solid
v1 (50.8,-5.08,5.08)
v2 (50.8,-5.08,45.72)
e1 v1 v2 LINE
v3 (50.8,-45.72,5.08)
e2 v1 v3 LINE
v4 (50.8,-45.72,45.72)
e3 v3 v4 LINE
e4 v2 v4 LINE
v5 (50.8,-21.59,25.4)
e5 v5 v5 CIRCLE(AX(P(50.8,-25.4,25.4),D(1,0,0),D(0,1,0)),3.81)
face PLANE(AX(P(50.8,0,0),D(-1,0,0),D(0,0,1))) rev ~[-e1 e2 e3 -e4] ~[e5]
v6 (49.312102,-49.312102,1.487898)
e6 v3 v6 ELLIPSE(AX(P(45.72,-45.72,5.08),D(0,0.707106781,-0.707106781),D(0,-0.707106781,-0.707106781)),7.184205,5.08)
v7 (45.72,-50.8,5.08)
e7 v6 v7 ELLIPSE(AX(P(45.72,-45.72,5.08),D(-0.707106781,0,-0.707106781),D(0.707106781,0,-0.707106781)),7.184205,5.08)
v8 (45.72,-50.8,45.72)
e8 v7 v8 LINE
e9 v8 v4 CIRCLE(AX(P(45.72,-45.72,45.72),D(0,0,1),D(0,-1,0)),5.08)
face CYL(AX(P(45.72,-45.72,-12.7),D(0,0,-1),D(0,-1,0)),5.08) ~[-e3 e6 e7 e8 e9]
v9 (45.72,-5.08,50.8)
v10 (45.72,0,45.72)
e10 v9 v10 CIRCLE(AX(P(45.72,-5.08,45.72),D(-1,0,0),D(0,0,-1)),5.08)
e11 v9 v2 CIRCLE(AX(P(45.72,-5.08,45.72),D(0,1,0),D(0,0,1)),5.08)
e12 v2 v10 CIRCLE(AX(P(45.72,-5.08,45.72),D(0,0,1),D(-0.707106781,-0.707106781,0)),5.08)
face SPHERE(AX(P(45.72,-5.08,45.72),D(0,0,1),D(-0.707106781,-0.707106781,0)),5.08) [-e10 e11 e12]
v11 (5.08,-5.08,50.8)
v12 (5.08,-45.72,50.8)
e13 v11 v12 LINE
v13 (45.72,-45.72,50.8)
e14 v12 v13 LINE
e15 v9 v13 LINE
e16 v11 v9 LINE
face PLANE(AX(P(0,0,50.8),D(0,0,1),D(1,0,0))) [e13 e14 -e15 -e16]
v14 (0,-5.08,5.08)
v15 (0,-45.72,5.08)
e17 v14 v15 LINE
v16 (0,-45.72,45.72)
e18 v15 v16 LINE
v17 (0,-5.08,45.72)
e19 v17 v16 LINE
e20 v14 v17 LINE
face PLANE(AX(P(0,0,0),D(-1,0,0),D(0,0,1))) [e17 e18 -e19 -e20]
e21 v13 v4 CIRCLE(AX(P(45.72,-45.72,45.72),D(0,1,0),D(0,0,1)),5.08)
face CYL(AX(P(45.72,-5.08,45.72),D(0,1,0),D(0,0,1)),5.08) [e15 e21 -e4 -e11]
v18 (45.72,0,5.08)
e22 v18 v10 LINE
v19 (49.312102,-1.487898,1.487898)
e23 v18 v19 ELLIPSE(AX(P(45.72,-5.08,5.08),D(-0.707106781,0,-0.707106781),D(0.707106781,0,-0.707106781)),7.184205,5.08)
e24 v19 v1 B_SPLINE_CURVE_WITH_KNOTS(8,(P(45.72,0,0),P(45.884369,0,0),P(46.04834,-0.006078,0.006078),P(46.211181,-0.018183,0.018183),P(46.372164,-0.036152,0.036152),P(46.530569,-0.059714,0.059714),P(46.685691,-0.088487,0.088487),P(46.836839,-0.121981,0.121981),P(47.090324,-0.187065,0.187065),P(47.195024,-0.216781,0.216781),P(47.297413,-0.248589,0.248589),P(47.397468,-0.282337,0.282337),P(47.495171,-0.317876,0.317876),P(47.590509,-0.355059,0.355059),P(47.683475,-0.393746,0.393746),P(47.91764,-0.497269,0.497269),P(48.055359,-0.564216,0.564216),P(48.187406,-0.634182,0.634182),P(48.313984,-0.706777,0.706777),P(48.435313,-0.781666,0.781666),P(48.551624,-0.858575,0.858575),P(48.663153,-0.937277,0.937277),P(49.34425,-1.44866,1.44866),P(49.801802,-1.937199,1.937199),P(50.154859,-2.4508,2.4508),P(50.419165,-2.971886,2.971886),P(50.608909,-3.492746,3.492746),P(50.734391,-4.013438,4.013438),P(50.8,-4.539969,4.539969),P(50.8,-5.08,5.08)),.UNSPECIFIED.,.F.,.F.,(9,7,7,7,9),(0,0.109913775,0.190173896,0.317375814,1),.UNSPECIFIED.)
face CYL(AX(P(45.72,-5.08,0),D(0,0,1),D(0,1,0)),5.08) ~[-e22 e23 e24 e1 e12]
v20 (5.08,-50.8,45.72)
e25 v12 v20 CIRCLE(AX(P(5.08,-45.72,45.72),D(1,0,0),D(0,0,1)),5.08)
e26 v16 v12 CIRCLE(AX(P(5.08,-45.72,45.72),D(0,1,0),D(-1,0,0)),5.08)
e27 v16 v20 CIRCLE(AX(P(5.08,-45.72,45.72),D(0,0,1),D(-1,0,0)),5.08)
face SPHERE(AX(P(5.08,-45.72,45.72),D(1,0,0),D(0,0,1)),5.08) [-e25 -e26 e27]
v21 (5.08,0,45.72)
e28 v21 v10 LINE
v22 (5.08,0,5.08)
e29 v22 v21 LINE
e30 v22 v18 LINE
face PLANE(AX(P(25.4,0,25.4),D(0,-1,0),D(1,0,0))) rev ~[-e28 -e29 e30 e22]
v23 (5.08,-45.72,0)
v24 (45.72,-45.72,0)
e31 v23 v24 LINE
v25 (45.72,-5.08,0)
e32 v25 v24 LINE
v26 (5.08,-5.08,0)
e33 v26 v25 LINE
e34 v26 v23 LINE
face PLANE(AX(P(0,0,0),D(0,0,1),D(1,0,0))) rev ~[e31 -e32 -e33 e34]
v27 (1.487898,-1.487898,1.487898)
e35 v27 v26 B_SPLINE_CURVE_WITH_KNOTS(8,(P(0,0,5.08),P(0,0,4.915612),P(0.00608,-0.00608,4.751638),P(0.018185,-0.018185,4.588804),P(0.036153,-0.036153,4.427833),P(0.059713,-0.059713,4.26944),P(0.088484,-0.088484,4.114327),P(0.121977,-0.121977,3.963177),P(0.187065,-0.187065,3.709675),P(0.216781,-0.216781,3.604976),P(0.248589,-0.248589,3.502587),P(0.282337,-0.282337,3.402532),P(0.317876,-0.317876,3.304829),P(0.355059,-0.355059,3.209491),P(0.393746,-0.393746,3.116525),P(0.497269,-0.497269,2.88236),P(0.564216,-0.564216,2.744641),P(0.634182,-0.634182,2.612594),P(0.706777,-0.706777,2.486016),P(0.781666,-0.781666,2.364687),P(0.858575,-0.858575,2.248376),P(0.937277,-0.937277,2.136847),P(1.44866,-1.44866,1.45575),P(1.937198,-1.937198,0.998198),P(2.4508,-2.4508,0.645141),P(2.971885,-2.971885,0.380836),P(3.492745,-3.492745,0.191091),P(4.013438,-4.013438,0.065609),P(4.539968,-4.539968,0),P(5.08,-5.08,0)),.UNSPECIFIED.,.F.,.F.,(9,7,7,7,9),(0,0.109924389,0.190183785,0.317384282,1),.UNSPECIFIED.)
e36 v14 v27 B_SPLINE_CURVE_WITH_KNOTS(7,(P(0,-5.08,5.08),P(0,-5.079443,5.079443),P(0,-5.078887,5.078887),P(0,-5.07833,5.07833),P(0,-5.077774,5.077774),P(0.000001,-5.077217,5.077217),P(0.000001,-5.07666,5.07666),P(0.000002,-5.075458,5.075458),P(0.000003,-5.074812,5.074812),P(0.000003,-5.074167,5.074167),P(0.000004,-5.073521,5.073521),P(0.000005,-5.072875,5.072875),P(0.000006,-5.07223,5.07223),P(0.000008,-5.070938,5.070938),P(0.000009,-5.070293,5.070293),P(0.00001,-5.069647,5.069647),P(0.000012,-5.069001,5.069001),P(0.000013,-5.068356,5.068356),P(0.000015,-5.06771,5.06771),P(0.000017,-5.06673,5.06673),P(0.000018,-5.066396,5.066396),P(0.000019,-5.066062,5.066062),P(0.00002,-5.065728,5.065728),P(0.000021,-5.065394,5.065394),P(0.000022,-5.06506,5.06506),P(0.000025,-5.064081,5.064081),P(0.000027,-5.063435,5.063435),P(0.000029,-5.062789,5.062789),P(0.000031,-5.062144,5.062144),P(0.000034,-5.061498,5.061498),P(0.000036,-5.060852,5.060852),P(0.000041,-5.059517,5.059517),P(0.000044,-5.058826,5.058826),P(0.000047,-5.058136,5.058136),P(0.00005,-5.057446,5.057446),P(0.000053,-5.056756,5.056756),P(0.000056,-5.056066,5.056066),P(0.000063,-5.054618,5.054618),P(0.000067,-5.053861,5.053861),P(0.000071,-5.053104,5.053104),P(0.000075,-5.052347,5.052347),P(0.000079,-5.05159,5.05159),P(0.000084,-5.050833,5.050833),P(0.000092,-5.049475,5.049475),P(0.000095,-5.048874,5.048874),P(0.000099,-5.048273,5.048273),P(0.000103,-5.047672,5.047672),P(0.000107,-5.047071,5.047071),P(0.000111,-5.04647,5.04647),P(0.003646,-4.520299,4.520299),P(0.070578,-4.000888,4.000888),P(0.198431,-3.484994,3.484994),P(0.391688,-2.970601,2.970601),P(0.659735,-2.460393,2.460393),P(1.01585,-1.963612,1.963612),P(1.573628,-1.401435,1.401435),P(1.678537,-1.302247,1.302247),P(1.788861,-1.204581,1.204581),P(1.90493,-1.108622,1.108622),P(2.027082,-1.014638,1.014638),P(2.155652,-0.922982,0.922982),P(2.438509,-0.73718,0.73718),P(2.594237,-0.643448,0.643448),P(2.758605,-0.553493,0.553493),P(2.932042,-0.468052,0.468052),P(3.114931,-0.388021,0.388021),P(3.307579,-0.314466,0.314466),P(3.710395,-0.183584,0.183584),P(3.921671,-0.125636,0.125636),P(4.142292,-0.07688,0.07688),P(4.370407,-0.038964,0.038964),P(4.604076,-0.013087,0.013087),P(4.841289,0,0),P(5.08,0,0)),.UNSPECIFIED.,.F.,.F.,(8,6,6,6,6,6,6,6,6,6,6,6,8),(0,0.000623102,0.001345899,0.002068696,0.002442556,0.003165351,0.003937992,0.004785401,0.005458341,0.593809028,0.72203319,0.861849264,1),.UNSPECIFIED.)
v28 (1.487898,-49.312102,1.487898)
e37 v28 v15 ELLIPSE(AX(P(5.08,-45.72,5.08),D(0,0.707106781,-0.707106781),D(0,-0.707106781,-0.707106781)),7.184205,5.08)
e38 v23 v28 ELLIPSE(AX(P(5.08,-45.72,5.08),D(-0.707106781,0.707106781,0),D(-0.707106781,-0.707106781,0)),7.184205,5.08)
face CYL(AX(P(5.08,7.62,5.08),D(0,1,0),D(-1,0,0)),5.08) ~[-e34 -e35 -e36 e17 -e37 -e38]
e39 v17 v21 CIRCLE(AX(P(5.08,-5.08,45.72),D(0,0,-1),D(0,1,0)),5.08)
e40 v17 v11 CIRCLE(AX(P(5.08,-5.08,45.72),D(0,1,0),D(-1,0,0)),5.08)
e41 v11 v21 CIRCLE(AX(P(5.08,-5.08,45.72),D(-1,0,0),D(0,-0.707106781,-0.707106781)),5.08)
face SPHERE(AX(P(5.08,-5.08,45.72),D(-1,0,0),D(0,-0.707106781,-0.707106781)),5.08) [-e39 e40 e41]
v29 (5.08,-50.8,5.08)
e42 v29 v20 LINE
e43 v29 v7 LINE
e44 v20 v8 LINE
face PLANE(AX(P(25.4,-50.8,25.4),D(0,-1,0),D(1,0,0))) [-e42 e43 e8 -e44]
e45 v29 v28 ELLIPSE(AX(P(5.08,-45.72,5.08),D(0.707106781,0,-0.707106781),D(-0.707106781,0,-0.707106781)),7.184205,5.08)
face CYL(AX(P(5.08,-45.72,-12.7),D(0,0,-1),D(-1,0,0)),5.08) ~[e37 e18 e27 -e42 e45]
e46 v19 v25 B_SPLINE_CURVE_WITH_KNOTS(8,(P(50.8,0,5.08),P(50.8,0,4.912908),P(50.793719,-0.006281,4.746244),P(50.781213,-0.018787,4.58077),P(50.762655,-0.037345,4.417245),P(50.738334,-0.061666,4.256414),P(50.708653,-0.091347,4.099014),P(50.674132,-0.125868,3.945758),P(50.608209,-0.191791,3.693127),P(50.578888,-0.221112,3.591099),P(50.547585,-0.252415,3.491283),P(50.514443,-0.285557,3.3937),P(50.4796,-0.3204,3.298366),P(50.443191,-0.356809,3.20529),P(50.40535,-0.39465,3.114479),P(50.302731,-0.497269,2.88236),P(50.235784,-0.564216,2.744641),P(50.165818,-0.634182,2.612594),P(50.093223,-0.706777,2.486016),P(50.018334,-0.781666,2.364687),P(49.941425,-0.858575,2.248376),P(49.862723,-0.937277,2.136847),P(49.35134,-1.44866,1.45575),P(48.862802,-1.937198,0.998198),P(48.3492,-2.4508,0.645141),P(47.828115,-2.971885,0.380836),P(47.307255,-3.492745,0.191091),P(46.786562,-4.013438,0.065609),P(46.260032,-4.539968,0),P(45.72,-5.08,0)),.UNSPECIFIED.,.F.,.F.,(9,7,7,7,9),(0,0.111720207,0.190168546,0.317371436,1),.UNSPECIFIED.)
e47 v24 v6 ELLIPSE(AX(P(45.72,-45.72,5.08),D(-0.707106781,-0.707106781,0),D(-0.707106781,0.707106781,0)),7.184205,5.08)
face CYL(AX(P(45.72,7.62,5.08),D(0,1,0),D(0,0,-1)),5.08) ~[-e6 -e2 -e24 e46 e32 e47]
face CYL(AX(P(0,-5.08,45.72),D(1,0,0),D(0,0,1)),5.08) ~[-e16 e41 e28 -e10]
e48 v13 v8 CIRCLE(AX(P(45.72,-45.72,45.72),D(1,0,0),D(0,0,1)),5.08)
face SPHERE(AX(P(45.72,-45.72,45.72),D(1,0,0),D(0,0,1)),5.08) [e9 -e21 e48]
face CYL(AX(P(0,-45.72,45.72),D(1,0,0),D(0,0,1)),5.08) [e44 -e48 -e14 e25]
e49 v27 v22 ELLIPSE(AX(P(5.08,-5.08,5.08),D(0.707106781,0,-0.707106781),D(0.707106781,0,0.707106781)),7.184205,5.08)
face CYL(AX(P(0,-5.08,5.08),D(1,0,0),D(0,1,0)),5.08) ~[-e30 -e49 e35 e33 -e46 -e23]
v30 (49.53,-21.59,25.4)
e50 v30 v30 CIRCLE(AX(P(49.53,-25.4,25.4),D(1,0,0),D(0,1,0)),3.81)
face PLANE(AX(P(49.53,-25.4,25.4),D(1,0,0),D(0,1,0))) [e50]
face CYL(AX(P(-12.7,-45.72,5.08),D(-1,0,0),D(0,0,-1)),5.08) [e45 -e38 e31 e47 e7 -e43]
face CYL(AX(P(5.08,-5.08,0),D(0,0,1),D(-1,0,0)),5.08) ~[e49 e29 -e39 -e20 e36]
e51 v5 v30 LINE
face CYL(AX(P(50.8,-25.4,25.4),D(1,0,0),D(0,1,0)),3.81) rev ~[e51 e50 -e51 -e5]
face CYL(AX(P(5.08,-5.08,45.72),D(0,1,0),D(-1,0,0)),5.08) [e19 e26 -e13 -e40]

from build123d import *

# Parameters (mm, degrees)
F0_W         = 50.8
F0_H         = 50.8
F1_DEPTH     = 50.8
F2_R         = 5.08
F3_R         = 5.08
F4_T1_DEPTH  = 58.42
F4_T3_DEPTH  = 76.2
F4_T5_DEPTH  = 40.64
F4_S9_W      = 5.08
F4_S9_H      = 5.08
F4_T10_DEPTH = 5.08
F4_S15_W     = 5.08
F4_S15_H     = 5.08
F4_T16_DEPTH = 5.08
F4_T20_ANGLE = 90
F4_T22_ANGLE = 90
F5_T1_DEPTH  = 66.04
F6_T1_DEPTH  = 66.04
F7_R         = 3.81
F8_DEPTH     = 1.27


# Not quite as in the source:
# - a fillet or chamfer that OpenCascade refuses, or shapes differently, is made with other operations: its cross-section is extruded or revolved along the edge and cut away or added


with BuildPart() as f1:
    # F0 (on Front) → F1 (new body)
    with BuildSketch(Plane.XZ):
        with Locations((25.4, 25.4)):
            Rectangle(F0_W, F0_H)
    extrude(amount=F1_DEPTH)

    # F2
    f2_edges = [f1.edges().sort_by_distance(p)[0] for p in [
        (25.4, -50.8, 50.8),
    ]]
    fillet(f2_edges, radius=F2_R)

    # F3
    f3_edges = [f1.edges().sort_by_distance(p)[0] for p in [
        (25.4, 0, 50.8),
        (0, 0, 25.4),
        (25.4, 0, 0),
        (50.8, 0, 25.4),
    ]]
    fillet(f3_edges, radius=F3_R)

    # F4: fillet of radius 5.08 on 4 edges, made by hand

    # F4_s2 → F4_t1 (cut)
    with BuildSketch(Plane.XY.offset(-12.7)):
        with BuildLine():
            ThreePointArc((0, -45.72), (1.4878975516, -49.3121024484), (5.08, -50.8))
            Line((5.08, -50.8), (0, -50.8))
            Line((0, -50.8), (0, -45.72))
        make_face()
        with BuildLine():
            ThreePointArc((45.72, -50.8), (49.3121024484, -49.3121024484), (50.8, -45.72))
            Line((50.8, -45.72), (50.8, -50.8))
            Line((50.8, -50.8), (45.72, -50.8))
        make_face()
    extrude(amount=F4_T1_DEPTH, mode=Mode.SUBTRACT)

    # F4_s4 → F4_t3 (cut)
    with BuildSketch(Plane.YZ.offset(-12.7)):
        with BuildLine():
            ThreePointArc((-45.72, 0), (-49.3121024484, 1.4878975516), (-50.8, 5.08))
            Line((-50.8, 5.08), (-50.8, 0))
            Line((-50.8, 0), (-45.72, 0))
        make_face()
    extrude(amount=F4_T3_DEPTH, mode=Mode.SUBTRACT)

    # F4_s6 → F4_t5 (cut)
    with BuildSketch(Plane.XZ.offset(5.08)):
        with BuildLine():
            ThreePointArc((45.72, 50.8), (49.3121024484, 49.3121024484), (50.8, 45.72))
            Line((50.8, 45.72), (50.8, 50.8))
            Line((50.8, 50.8), (45.72, 50.8))
        make_face()
        with BuildLine():
            ThreePointArc((0, 45.72), (1.4878975516, 49.3121024484), (5.08, 50.8))
            Line((5.08, 50.8), (0, 50.8))
            Line((0, 50.8), (0, 45.72))
        make_face()
    extrude(amount=F4_T5_DEPTH, mode=Mode.SUBTRACT)


with BuildPart() as f4_tool8:
    # F4_s9 → F4_t10 (new body)
    with BuildSketch(Plane.XY.offset(45.72)):
        with Locations((48.26, -2.54)):
            Rectangle(F4_S9_W, F4_S9_H)
    extrude(amount=F4_T10_DEPTH)

    # F4_s11 → F4_t12 (revolve, cut)
    with BuildSketch(Plane(origin=(45.72, -5.08, 45.72), x_dir=(-0.7071067812, -0.7071067812, 0), z_dir=(-0.7071067812, 0.7071067812, 0))):
        with BuildLine():
            ThreePointArc((0, -5.08), (5.08, 0), (0, 5.08))
            Line((0, 5.08), (0, -5.08))
        make_face()
    revolve(axis=Axis((45.72, -5.08, 45.72), (0, 0, 1)), mode=Mode.SUBTRACT)


with BuildPart() as f1_1:
    add(f1.part)

    # F4_t7: cut F4_tool8
    add(f4_tool8.part, mode=Mode.SUBTRACT)


with BuildPart() as f4_tool14:
    # F4_s15 → F4_t16 (new body)
    with BuildSketch(Plane.YZ.offset(5.08)):
        with Locations((-2.54, 48.26)):
            Rectangle(F4_S15_W, F4_S15_H)
    extrude(amount=-F4_T16_DEPTH)

    # F4_s17 → F4_t18 (revolve, cut)
    with BuildSketch(Plane(origin=(5.08, -5.08, 45.72), x_dir=(0, -0.7071067812, -0.7071067812), z_dir=(0, 0.7071067812, -0.7071067812))):
        with BuildLine():
            ThreePointArc((0, -5.08), (5.08, 0), (0, 5.08))
            Line((0, 5.08), (0, -5.08))
        make_face()
    revolve(axis=Axis((5.08, -5.08, 45.72), (-1, 0, 0)), mode=Mode.SUBTRACT)


with BuildPart() as f1_2:
    add(f1_1.part)

    # F4_t13: cut F4_tool14
    add(f4_tool14.part, mode=Mode.SUBTRACT)

    # F4_s19 → F4_t20 (revolve, cut)
    with BuildSketch(Plane.XZ.offset(45.72)):
        with BuildLine():
            ThreePointArc((45.72, 50.8), (49.3121024484, 49.3121024484), (50.8, 45.72))
            Line((50.8, 45.72), (50.8, 50.8))
            Line((50.8, 50.8), (45.72, 50.8))
        make_face()
    revolve(axis=Axis((50.8, -45.72, 45.72), (1, 0, 0)), revolution_arc=F4_T20_ANGLE, mode=Mode.SUBTRACT)

    # F4_s21 → F4_t22 (revolve, cut)
    with BuildSketch(Plane.XZ.offset(45.72)):
        with BuildLine():
            ThreePointArc((0, 45.72), (1.4878975516, 49.3121024484), (5.08, 50.8))
            Line((5.08, 50.8), (0, 50.8))
            Line((0, 50.8), (0, 45.72))
        make_face()
    revolve(axis=Axis((0, -45.72, 45.72), (1, 0, 0)), revolution_arc=F4_T22_ANGLE, mode=Mode.SUBTRACT)

    # F5: fillet of radius 5.08 on 4 edges, made by hand

    # F5_s2 → F5_t1 (cut)
    with BuildSketch(Plane.XZ.offset(-7.62)):
        with BuildLine():
            ThreePointArc((0, 5.08), (1.4878975516, 1.4878975516), (5.08, 0))
            Line((5.08, 0), (0, 0))
            Line((0, 0), (0, 5.08))
        make_face()
    extrude(amount=F5_T1_DEPTH, mode=Mode.SUBTRACT)

    # F6: fillet of radius 5.08 on 4 edges, made by hand

    # F6_s2 → F6_t1 (cut)
    with BuildSketch(Plane.XZ.offset(-7.62)):
        with BuildLine():
            ThreePointArc((45.72, 0), (49.3121024484, 1.4878975516), (50.8, 5.08))
            Line((50.8, 5.08), (50.8, 0))
            Line((50.8, 0), (45.72, 0))
        make_face()
    extrude(amount=F6_T1_DEPTH, mode=Mode.SUBTRACT)

    # F7 (on face) → F8 (cut)
    with BuildSketch(Plane.YZ.offset(50.8)):
        with Locations((-25.4, 25.4)):
            Circle(F7_R)
    extrude(amount=-F8_DEPTH, mode=Mode.SUBTRACT)


solid = f1_2.part
